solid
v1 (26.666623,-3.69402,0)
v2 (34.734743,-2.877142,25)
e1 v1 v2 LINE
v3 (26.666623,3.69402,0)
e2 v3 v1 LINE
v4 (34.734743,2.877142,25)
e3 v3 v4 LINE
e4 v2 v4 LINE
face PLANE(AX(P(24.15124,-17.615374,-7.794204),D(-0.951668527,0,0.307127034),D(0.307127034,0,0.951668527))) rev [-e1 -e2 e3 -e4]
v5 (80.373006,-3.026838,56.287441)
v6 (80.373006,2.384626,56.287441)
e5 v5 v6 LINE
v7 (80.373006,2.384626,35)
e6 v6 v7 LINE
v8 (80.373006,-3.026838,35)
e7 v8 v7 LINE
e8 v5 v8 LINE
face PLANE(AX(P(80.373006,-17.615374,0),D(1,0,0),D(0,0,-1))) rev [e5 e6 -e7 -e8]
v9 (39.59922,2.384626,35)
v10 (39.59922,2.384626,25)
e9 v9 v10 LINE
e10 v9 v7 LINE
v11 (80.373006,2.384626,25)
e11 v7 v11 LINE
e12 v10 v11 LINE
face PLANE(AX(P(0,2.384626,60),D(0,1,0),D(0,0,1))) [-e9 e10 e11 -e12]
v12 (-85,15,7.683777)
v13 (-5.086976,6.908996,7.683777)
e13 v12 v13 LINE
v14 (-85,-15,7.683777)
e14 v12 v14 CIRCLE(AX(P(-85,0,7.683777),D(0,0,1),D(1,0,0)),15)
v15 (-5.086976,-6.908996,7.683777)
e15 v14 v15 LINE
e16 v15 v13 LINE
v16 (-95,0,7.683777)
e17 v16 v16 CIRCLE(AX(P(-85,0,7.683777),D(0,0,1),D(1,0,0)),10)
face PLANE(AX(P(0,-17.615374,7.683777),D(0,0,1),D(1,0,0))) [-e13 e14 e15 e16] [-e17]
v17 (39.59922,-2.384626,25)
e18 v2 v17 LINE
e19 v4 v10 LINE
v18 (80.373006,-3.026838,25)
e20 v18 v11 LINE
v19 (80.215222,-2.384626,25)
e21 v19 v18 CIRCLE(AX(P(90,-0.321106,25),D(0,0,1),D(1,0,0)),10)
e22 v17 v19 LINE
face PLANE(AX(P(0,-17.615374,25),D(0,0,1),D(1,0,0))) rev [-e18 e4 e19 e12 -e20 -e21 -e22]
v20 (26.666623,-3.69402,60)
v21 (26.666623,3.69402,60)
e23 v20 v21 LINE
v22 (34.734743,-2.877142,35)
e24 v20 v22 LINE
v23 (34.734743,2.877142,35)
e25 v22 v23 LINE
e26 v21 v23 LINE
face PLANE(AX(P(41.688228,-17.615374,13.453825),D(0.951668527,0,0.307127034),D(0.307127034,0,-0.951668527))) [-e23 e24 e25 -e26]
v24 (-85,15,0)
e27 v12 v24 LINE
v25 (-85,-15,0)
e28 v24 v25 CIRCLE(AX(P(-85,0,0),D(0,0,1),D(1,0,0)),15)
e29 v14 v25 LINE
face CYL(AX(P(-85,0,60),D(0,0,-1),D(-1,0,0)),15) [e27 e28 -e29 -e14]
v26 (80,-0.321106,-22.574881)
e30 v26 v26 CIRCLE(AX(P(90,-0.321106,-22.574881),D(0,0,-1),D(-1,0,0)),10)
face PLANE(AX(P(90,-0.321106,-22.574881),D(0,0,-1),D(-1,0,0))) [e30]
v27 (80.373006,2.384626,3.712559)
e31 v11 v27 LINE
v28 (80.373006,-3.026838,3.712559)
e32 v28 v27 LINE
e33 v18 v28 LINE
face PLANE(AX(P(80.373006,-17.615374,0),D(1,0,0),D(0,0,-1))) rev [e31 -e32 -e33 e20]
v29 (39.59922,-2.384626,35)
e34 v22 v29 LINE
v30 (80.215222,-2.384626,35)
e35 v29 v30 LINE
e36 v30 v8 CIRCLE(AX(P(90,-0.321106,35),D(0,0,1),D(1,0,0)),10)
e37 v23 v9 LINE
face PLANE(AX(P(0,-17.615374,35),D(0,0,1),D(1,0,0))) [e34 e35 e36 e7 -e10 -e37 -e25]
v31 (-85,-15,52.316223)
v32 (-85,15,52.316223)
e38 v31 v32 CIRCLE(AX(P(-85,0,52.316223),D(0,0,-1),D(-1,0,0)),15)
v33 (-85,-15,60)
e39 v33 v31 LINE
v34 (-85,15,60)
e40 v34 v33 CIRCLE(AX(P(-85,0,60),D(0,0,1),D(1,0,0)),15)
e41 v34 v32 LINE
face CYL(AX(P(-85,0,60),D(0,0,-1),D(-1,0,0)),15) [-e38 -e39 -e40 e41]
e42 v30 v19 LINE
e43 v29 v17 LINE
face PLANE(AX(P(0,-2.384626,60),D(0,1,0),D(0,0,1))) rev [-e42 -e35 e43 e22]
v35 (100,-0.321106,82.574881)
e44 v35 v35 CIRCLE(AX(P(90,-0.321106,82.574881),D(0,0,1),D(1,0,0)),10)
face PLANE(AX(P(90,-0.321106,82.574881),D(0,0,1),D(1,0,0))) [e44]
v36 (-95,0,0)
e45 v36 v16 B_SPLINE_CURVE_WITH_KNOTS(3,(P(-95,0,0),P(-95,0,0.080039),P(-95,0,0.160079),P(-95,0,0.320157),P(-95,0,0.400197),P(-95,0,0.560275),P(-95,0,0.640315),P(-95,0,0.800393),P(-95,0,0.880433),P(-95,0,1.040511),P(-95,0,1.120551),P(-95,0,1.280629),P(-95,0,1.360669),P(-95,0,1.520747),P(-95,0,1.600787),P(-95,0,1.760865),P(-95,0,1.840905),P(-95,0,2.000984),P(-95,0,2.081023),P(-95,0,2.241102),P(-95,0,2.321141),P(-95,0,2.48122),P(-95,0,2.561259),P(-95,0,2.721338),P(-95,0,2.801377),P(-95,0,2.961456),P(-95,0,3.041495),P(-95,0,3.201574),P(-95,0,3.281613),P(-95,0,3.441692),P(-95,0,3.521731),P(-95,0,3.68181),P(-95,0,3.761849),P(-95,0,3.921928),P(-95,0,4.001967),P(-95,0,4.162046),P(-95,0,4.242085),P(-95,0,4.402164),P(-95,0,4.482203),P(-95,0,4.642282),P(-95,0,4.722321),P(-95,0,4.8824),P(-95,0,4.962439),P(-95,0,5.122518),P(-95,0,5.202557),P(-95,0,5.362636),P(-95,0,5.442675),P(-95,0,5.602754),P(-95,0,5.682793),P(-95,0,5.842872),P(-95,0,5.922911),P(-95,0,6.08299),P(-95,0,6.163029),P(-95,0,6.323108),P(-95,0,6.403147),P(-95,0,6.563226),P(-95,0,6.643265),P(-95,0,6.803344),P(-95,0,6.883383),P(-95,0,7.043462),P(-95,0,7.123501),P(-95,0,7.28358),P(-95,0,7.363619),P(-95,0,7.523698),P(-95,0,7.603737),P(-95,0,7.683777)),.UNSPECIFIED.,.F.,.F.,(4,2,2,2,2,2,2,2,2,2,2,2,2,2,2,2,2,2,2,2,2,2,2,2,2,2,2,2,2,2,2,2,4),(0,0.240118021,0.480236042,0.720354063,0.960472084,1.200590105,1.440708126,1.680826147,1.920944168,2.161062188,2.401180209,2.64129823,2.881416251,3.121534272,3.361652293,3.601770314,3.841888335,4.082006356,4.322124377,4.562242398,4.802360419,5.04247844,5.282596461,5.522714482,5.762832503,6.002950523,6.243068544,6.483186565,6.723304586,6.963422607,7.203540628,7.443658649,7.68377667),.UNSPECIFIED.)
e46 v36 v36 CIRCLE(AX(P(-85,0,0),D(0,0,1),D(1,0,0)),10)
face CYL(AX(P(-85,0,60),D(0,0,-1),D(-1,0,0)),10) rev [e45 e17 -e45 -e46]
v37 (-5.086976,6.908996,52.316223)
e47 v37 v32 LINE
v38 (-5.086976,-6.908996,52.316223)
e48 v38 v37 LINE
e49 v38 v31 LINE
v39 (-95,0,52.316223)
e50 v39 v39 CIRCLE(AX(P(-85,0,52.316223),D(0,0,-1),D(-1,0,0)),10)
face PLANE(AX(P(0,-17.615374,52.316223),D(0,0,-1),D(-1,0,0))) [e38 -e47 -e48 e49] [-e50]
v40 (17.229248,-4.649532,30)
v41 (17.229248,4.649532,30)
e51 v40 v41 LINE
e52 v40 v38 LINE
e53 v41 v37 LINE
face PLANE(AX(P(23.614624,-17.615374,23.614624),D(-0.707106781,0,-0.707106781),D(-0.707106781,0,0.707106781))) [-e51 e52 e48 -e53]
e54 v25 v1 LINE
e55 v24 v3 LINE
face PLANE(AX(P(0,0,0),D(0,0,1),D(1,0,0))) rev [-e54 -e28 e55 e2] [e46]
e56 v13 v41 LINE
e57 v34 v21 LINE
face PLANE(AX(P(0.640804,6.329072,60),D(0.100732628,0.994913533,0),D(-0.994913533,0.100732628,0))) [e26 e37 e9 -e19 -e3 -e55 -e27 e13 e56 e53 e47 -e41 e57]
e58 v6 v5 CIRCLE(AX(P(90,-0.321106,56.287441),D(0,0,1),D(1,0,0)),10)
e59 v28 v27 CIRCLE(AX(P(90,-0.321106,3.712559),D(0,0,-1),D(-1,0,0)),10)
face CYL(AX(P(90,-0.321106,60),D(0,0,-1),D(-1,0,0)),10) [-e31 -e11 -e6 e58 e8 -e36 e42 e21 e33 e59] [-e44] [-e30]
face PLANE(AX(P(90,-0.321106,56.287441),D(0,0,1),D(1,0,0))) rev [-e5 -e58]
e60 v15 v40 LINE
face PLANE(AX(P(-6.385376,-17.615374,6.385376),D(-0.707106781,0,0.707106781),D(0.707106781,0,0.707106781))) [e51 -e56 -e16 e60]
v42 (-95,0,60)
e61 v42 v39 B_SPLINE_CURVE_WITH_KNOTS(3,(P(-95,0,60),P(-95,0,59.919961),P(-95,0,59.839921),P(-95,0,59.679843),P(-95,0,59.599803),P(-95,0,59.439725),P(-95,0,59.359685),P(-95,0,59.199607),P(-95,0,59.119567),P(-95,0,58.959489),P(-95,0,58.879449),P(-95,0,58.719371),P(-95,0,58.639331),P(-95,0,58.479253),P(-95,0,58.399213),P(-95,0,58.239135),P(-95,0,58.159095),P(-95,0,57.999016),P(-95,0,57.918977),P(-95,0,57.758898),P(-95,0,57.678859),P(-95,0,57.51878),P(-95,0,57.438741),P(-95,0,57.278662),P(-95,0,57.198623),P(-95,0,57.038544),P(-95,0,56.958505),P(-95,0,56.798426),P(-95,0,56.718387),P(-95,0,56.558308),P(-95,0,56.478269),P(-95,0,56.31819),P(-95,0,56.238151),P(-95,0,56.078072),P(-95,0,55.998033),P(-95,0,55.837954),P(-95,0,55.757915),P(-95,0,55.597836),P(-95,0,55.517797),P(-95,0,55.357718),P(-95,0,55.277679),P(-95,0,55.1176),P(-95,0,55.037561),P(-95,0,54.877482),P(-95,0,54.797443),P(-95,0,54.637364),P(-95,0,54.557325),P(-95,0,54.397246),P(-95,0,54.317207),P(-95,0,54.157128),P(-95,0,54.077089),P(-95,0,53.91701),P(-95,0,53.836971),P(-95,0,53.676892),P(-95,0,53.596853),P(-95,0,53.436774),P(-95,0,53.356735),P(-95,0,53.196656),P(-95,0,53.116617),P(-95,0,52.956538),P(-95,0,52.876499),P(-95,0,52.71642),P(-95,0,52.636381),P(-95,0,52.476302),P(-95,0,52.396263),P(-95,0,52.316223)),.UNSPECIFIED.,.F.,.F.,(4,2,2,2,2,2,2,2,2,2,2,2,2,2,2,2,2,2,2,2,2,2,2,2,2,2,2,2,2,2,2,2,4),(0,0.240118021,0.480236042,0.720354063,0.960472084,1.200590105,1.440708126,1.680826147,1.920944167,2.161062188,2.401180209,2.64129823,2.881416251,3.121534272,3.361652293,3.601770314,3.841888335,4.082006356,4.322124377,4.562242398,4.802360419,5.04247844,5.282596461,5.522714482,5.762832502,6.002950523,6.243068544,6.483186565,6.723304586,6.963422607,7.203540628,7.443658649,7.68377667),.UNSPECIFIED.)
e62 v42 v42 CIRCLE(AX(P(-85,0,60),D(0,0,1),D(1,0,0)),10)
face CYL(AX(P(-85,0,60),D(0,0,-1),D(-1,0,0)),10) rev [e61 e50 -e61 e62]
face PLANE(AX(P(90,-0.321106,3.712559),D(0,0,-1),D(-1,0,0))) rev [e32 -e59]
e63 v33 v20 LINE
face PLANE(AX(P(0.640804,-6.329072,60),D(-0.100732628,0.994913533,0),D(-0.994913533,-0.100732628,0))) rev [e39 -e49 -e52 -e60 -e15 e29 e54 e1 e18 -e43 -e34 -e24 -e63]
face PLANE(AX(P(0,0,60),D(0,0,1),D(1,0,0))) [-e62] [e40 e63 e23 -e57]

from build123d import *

# Parameters (mm, degrees)
SKETCH1_R           = 10
BOSS_EXTRUDE1_DEPTH = 60
SKETCH2_OUTSIDE_W   = 244.19
SKETCH2_OUTSIDE_H   = 104.19
CUT_EXTRUDE1_DEPTH  = 20
SKETCH3_R           = 10
BOSS_EXTRUDE2_DEPTH = 26.2874406
BOSS_EXTRUDE3_START = 26.2874406
SKETCH4_R           = 10
BOSS_EXTRUDE3_DEPTH = 26.2874406


with BuildPart() as part:
    # Sketch1 → Boss-Extrude1 (new body)
    with BuildSketch(Plane.XY):
        with BuildLine():
            ThreePointArc((-85, 15), (-100, 0), (-85, -15))
            Line((-85, -15), (39.599219547, -2.384625528))
            Line((39.599219547, -2.384625528), (80.215221564, -2.384625528))
            ThreePointArc((80.215221564, -2.384625528), (99.994531838, -0.651762376), (80.373005951, 2.384625528))
            Line((80.373005951, 2.384625528), (39.599219547, 2.384625528))
            Line((39.599219547, 2.384625528), (-85, 15))
        make_face()
        with Locations((-85, 0)):
            Circle(SKETCH1_R, mode=Mode.SUBTRACT)
    extrude(amount=BOSS_EXTRUDE1_DEPTH)

    # Sketch2 outside → Cut-Extrude1 (cut, symmetric)
    with BuildSketch(Plane(origin=(0, 2.384625528, 0), x_dir=(1, 0, 0), z_dir=(0, 1, 0))):
        with Locations((0, -30)):
            Rectangle(SKETCH2_OUTSIDE_W, SKETCH2_OUTSIDE_H)
        Polygon((34.734743134, -25), (26.666623154, 0), (-100, 0), (-100, -7.68377667), (-5.086975799, -7.68377667), (17.229247531, -30), (-5.086975799, -52.31622333), (-100, -52.31622333), (-100, -60), (26.666623154, -60), (34.734743134, -35), (80.373005951, -35), (80.373005951, -56.2874406), (100, -56.2874406), (100, -3.7125594), (80.373005951, -3.7125594), (80.373005951, -25), align=None, mode=Mode.SUBTRACT)
    extrude(amount=CUT_EXTRUDE1_DEPTH, both=True, mode=Mode.SUBTRACT)

    # Sketch3 → Boss-Extrude2 (add)
    with BuildSketch(Plane.XY.offset(56.2874406)):
        with Locations((90, -0.321106458)):
            Circle(SKETCH3_R)
    extrude(amount=BOSS_EXTRUDE2_DEPTH)

    # Sketch4 → Boss-Extrude3 (add)
    with BuildSketch(Plane(origin=(0, 0, 3.7125594), x_dir=(-1, 0, 0), z_dir=(0, 0, -1)).offset(BOSS_EXTRUDE3_START)):
        with Locations((-90, -0.321106458)):
            Circle(SKETCH4_R)
    extrude(amount=-BOSS_EXTRUDE3_DEPTH)


solid = part.part
